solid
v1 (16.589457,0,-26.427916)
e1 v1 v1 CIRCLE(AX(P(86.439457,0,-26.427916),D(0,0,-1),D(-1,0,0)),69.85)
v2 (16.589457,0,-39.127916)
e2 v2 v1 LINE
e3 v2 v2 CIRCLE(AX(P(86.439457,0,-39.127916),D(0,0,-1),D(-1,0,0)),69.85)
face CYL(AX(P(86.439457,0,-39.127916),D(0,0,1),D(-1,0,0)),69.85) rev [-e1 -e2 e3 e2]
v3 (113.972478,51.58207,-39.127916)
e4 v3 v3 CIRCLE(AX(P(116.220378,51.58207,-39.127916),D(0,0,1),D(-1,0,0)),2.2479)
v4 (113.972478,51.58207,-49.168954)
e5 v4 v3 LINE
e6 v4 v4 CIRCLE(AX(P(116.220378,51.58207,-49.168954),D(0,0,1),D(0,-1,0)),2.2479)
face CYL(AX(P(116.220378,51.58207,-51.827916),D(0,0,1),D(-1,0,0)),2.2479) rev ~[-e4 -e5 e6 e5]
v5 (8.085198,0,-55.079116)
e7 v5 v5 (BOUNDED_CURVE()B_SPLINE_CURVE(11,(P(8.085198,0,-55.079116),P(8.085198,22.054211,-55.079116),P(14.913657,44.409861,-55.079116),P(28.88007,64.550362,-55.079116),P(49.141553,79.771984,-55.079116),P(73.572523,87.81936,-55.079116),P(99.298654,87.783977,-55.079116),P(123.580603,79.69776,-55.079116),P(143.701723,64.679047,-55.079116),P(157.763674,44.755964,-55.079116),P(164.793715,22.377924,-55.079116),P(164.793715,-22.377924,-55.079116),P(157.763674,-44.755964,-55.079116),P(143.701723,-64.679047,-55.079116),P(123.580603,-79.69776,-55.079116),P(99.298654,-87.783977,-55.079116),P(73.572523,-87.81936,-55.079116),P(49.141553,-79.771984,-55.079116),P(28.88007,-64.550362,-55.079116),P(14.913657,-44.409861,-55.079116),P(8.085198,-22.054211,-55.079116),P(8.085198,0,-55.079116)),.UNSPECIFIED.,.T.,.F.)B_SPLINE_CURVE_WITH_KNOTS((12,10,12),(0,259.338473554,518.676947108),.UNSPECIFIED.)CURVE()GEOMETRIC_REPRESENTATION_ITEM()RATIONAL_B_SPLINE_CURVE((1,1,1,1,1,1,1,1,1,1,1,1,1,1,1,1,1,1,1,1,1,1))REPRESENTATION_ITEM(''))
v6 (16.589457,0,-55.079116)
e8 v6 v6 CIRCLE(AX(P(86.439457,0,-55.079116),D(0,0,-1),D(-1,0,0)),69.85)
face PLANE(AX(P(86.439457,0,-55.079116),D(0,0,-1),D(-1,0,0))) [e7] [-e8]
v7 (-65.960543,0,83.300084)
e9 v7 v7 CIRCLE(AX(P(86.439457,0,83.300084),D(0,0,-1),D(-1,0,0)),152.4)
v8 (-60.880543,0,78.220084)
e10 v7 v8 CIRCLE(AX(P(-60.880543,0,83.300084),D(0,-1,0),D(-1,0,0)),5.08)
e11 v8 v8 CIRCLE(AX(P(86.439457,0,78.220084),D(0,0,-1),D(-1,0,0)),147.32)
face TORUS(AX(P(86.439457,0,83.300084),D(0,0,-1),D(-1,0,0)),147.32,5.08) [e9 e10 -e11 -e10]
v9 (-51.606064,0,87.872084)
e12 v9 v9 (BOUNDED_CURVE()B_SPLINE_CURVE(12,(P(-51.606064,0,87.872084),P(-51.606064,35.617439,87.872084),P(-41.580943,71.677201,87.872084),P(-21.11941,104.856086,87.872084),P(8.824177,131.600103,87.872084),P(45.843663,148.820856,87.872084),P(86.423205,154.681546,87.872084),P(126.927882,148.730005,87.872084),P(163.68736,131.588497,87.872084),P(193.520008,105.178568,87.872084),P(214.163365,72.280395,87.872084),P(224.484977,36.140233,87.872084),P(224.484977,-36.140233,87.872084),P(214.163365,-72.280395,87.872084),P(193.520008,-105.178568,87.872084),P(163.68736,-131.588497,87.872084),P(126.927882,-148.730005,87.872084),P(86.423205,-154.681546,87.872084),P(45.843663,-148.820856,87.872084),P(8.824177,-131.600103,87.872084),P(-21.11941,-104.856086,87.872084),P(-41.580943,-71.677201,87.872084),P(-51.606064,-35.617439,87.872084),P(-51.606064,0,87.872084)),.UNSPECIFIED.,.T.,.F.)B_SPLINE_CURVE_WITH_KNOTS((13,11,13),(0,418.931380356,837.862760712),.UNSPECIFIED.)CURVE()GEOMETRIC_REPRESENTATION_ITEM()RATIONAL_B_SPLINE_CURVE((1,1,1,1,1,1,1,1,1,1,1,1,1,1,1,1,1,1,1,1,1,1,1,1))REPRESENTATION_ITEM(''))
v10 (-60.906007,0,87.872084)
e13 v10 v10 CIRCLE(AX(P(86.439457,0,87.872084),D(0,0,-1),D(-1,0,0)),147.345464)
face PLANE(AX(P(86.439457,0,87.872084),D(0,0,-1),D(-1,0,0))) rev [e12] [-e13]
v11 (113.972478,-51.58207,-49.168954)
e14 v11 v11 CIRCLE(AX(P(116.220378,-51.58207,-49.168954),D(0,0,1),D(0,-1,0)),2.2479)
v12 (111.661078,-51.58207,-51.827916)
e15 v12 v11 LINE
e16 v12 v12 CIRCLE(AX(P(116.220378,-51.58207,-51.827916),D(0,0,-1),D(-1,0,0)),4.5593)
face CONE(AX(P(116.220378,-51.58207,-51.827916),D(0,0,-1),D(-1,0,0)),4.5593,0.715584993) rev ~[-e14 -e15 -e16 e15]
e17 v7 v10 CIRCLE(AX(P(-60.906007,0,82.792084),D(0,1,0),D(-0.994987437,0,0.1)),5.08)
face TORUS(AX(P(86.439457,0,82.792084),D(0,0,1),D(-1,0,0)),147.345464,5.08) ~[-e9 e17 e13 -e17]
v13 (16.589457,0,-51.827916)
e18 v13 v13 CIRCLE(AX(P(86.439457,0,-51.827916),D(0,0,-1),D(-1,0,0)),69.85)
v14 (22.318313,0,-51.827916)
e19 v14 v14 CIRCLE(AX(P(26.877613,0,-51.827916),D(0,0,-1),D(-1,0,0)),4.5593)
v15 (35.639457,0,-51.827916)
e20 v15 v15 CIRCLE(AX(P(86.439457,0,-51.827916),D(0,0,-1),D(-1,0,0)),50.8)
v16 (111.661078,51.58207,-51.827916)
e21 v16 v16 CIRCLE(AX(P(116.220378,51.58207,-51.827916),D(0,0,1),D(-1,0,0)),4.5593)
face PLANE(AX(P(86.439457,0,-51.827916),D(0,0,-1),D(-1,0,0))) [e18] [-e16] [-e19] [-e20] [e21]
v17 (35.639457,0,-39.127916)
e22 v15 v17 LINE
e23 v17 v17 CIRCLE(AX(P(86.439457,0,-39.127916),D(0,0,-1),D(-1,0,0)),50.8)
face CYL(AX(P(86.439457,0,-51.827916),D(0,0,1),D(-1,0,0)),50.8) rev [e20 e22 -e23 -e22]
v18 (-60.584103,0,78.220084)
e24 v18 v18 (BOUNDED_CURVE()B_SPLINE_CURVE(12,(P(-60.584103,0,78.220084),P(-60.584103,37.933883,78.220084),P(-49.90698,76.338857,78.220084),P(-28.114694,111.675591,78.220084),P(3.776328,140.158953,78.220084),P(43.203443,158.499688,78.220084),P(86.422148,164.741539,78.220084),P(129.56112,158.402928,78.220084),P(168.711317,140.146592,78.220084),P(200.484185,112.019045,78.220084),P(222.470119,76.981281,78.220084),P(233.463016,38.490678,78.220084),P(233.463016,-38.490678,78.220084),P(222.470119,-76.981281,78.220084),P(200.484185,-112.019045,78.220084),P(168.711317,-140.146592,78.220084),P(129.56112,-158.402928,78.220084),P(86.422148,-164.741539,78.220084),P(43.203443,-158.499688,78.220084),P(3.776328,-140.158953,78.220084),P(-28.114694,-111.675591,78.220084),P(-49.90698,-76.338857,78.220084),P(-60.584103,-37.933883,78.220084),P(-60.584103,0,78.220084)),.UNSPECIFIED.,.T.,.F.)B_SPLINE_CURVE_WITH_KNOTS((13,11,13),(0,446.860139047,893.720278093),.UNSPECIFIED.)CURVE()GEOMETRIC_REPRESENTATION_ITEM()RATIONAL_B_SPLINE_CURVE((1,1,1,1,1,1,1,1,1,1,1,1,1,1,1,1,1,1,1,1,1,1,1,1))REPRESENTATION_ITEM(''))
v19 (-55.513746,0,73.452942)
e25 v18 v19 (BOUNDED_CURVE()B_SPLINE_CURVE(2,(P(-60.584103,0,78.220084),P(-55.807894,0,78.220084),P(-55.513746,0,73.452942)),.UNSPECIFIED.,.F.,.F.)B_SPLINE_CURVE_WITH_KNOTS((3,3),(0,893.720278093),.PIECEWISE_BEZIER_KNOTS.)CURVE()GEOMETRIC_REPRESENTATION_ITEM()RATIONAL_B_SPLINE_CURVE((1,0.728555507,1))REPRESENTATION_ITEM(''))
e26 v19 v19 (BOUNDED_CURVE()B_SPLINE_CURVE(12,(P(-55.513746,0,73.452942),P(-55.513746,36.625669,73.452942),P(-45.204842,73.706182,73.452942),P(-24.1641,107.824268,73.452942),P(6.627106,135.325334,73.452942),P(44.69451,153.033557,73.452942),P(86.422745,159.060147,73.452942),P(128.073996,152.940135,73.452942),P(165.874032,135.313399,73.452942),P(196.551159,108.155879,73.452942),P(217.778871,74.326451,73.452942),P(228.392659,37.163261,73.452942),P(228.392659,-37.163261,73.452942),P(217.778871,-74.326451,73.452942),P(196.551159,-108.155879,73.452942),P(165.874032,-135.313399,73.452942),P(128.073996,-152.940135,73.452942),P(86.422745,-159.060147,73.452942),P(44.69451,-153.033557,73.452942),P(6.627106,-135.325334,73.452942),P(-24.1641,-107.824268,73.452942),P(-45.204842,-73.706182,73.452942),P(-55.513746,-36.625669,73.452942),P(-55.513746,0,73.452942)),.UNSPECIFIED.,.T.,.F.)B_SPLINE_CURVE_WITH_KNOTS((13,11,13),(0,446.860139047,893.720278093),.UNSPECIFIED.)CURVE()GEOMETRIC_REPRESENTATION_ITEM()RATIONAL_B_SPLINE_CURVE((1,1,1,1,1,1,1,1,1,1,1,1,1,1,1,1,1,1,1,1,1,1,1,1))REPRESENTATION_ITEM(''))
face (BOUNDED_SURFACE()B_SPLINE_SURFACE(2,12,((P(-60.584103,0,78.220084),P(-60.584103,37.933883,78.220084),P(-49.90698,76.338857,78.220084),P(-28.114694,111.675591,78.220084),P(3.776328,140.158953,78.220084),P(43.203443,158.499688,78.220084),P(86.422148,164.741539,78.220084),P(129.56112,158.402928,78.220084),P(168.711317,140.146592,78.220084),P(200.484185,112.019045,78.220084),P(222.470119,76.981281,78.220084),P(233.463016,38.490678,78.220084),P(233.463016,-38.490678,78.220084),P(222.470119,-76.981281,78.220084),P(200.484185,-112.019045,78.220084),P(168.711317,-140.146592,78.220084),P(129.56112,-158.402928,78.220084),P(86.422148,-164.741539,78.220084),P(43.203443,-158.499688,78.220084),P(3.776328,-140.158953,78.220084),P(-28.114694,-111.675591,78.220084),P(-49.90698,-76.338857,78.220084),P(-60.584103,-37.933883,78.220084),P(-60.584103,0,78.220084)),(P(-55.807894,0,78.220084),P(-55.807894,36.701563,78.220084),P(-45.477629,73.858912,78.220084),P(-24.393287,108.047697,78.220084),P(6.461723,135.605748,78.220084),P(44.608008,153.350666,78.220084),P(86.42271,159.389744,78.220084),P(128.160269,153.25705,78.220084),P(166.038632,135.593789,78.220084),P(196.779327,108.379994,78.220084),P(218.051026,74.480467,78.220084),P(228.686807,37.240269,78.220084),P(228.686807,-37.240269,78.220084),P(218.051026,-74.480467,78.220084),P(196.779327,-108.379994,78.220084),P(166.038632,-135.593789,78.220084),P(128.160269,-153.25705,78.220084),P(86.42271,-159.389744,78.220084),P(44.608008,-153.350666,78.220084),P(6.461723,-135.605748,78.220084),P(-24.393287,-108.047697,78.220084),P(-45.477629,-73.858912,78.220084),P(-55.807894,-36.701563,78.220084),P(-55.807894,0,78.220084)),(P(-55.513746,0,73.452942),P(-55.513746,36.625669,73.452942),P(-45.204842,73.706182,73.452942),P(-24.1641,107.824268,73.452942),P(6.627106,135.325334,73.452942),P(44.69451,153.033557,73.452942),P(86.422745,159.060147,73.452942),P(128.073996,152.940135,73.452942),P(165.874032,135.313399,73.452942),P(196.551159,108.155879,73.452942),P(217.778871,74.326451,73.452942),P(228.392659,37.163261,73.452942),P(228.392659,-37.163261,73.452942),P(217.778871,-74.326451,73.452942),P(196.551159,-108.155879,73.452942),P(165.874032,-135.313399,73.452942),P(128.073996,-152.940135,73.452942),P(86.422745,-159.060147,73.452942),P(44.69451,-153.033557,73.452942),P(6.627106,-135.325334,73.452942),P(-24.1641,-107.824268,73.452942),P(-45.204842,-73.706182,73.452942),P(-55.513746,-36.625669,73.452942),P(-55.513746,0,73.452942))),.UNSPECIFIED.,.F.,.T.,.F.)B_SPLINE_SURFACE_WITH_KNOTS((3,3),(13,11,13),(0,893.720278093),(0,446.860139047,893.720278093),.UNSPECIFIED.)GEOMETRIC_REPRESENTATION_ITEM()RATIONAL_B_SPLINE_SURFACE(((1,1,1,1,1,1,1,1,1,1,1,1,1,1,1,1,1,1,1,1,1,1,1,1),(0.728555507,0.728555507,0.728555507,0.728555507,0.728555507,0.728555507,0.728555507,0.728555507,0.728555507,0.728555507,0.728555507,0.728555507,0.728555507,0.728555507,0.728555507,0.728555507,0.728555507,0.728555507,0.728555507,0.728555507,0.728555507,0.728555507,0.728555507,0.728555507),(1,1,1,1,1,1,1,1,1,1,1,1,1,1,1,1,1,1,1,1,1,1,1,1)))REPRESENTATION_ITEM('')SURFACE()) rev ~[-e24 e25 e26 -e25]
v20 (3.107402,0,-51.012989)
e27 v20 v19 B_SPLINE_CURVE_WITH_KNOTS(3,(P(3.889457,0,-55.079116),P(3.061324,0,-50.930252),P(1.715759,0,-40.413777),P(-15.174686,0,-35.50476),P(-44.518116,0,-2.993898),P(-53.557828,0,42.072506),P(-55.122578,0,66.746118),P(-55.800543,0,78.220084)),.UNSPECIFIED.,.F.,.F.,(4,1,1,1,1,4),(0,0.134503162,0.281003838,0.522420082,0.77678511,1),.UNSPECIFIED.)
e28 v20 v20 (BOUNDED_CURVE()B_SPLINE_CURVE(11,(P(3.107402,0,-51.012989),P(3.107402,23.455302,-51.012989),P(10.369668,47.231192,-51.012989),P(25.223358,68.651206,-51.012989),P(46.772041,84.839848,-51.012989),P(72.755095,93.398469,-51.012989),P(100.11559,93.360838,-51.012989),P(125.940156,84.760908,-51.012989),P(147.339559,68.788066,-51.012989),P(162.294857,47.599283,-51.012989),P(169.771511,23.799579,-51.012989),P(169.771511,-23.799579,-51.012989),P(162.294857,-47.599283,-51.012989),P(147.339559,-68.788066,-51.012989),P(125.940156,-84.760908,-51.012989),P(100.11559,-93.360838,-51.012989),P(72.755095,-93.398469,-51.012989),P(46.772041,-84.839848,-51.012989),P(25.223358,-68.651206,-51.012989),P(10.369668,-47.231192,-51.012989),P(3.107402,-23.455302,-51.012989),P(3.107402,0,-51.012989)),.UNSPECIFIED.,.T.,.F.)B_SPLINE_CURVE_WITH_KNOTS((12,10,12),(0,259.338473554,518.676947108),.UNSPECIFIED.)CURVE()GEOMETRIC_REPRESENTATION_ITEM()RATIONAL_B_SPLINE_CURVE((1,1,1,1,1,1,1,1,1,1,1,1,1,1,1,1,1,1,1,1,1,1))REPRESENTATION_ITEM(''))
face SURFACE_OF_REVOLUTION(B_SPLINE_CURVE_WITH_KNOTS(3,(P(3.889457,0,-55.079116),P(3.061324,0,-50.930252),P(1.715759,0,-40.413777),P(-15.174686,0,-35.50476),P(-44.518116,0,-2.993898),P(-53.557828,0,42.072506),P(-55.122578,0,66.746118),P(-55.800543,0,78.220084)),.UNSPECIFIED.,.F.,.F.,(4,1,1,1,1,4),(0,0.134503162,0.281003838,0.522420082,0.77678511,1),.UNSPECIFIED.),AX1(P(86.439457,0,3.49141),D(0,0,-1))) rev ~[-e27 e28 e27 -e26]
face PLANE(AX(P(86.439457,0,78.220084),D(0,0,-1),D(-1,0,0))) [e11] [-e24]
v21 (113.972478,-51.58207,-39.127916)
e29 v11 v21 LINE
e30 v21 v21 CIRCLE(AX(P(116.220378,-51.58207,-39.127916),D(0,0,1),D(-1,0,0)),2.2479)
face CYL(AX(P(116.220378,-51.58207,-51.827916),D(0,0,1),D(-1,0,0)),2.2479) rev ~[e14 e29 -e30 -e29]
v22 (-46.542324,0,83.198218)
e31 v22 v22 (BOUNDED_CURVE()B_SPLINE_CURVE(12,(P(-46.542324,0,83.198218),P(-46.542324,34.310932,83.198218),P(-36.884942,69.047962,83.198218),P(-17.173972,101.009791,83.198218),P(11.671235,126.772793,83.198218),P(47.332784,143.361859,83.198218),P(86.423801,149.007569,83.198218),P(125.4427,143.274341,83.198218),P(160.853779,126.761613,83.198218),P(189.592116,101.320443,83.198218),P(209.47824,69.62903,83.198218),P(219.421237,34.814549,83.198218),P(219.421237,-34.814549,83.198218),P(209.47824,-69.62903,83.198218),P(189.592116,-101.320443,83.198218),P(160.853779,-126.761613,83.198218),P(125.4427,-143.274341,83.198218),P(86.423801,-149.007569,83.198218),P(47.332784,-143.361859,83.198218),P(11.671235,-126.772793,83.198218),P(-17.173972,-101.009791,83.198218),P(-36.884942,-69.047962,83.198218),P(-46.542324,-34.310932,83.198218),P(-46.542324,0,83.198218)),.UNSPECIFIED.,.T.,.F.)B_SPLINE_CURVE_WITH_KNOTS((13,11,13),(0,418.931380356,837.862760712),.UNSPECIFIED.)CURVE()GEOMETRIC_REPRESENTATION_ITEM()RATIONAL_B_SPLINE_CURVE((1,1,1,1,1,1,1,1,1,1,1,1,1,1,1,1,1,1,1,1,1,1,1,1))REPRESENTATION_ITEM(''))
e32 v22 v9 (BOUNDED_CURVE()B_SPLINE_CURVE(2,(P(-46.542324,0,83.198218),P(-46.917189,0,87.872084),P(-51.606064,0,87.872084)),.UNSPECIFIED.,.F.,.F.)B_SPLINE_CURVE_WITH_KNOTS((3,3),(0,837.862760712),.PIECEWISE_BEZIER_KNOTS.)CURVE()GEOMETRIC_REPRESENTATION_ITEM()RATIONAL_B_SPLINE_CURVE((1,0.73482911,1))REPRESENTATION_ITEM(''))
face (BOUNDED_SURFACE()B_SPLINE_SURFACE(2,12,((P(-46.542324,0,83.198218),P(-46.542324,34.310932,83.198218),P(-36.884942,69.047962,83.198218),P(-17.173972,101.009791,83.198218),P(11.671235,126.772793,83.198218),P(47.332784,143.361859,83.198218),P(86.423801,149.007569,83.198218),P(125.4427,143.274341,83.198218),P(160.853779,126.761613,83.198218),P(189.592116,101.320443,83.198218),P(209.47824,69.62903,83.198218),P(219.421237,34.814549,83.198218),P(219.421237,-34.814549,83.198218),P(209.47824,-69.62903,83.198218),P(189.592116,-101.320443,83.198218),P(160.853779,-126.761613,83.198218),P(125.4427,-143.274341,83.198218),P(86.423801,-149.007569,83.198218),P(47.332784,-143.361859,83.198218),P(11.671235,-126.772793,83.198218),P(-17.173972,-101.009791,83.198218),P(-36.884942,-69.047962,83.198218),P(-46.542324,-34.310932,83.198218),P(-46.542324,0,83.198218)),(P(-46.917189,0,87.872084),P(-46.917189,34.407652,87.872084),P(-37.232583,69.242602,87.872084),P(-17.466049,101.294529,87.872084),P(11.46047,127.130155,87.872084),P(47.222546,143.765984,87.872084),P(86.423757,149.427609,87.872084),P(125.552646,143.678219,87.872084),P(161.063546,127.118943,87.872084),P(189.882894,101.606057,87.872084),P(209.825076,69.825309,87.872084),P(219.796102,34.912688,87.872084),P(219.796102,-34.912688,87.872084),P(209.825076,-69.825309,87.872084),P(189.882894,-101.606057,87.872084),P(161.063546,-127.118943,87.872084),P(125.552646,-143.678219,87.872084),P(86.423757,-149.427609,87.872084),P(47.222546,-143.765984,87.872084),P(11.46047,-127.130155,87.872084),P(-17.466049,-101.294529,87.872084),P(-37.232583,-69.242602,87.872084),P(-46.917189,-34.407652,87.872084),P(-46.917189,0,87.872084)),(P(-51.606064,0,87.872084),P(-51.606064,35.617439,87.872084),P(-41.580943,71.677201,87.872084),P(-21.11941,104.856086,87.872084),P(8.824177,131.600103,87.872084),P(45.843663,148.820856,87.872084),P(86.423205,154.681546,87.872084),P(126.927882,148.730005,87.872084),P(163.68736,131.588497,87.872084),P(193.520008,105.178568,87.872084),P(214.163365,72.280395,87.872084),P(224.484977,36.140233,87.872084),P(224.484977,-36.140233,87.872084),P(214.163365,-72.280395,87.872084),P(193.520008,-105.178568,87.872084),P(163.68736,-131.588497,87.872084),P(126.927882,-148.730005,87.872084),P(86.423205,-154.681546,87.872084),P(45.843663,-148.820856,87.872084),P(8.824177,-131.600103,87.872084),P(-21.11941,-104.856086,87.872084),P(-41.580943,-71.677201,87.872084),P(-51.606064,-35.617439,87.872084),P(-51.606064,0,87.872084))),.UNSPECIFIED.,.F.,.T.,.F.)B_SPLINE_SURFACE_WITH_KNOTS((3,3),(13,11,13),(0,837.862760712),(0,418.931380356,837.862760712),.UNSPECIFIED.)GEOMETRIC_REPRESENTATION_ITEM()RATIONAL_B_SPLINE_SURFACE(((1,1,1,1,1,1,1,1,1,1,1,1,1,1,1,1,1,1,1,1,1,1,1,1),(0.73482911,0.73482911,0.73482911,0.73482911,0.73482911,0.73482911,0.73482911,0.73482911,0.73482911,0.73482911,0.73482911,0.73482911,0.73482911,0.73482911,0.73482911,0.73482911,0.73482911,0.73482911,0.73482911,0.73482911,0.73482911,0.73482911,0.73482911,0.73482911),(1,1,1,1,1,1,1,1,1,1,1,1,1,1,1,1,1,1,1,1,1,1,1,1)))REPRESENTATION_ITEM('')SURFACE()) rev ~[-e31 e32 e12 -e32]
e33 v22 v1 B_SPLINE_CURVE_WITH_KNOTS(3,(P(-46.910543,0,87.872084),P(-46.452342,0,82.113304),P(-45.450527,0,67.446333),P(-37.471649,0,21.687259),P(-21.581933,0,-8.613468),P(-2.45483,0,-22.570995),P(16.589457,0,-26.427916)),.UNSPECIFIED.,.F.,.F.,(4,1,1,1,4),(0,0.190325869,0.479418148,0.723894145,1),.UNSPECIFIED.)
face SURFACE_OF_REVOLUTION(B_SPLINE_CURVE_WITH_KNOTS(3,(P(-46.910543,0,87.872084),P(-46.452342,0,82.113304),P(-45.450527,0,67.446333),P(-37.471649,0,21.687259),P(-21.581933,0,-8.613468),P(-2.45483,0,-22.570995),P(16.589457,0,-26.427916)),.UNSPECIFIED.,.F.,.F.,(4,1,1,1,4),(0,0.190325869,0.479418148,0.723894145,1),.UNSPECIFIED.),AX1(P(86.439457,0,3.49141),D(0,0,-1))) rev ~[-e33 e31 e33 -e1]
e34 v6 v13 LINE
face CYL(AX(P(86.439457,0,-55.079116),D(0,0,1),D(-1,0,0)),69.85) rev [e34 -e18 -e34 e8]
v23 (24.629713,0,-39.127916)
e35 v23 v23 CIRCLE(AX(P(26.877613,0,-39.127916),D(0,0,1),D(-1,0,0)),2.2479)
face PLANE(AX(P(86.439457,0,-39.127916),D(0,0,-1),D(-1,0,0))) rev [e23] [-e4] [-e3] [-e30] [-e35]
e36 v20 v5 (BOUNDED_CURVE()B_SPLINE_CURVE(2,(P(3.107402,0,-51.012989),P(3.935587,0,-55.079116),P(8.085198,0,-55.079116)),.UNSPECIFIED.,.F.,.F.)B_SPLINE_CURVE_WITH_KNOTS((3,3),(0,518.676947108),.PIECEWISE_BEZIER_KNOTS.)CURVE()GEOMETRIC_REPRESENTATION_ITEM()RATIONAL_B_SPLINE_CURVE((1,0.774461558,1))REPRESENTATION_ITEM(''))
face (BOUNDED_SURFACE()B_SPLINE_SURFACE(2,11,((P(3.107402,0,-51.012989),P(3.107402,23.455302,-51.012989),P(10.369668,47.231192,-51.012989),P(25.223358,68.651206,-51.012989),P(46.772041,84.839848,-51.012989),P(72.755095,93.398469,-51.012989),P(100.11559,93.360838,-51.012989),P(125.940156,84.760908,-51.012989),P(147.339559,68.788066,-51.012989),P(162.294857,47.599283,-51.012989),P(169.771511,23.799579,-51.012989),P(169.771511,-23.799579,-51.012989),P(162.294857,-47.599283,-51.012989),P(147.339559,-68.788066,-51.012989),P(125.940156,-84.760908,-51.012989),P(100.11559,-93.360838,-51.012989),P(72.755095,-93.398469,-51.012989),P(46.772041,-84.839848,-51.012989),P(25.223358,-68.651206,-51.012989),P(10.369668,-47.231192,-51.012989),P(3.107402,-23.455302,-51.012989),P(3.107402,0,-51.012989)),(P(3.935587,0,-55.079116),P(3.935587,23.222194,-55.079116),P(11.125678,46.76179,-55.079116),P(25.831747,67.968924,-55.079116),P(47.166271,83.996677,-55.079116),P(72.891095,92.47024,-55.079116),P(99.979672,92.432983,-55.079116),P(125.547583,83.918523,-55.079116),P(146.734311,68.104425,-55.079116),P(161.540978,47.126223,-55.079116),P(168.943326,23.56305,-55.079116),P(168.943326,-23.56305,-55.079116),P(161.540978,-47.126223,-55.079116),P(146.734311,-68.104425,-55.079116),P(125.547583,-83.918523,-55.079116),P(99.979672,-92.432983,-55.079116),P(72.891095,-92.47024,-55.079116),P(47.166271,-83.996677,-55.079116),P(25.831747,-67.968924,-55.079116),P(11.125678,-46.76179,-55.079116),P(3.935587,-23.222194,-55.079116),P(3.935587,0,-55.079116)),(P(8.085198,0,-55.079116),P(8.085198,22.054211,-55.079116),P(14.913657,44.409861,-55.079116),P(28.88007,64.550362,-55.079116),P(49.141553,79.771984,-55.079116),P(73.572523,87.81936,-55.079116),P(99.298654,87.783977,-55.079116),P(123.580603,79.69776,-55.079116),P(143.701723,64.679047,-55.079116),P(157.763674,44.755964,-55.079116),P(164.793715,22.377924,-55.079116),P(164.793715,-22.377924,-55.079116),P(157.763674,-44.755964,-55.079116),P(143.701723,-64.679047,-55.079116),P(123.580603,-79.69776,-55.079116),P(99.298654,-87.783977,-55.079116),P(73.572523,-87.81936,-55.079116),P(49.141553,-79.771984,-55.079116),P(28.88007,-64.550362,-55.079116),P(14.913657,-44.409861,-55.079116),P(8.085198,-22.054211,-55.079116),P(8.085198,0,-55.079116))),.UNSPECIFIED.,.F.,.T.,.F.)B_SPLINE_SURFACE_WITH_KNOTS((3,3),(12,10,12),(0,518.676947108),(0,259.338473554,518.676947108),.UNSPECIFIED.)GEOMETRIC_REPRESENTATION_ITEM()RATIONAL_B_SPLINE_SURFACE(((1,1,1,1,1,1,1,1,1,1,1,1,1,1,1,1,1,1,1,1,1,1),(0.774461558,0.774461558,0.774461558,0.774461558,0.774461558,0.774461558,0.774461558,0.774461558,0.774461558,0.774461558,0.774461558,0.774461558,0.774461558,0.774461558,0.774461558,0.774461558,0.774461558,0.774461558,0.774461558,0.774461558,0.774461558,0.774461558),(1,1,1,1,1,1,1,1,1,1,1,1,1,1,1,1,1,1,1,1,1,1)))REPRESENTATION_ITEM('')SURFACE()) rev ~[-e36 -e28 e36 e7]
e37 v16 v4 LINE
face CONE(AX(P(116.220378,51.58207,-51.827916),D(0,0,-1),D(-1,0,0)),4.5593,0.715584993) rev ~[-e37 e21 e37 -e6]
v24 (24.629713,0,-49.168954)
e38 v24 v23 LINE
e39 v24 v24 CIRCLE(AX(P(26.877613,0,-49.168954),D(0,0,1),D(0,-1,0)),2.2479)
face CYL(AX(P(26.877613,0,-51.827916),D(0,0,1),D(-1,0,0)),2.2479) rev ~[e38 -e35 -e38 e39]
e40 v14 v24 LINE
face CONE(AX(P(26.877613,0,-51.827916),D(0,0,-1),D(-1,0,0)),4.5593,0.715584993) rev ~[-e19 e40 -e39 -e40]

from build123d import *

# Parameters (mm, degrees)
F2_R           = 5.08
F5_D           = 4.4958
F5_CSINK_D     = 9.1186
F5_CSINK_ANGLE = 82


# Not quite as in the source:
# - a fillet or chamfer that OpenCascade refuses, or shapes differently, is made with other operations: its cross-section is extruded or revolved along the edge and cut away or added


with BuildPart() as f1:
    # F0 (on Front) → F1 (revolve)
    with BuildSketch(Plane.XZ):
        with BuildLine():
            Line((35.6394565043, -51.8279158927), (35.6394565043, -39.1279158927))
            Line((35.6394565043, -39.1279158927), (16.5894565043, -39.1279158927))
            Line((16.5894565043, -39.1279158927), (16.5894565043, -26.4279158927))
            add(Edge.make_bspline(
                [(-46.9105434957, 87.8720841073), (-46.4523417325, 82.1133038662), (-45.4505271847, 67.4463326401), (-37.4716489611, 21.6872589154), (-21.5819325296, -8.6134677414), (-2.4548303935, -22.5709949341), (16.5894565043, -26.4279158927)],
                knots=[0, 0, 0, 0, 0.1903258692, 0.4794181484, 0.723894145, 1, 1, 1, 1], degree=3))
            Line((-46.9105434957, 87.8720841073), (-65.9605434957, 87.8720841073))
            Line((-65.9605434957, 87.8720841073), (-65.9605434957, 78.2200841073))
            Line((-65.9605434957, 78.2200841073), (-55.8005434957, 78.2200841073))
            add(Edge.make_bspline(
                [(3.8894565043, -55.0791158927), (3.0613241863, -50.9302523012), (1.7157592211, -40.4137768343), (-15.1746857428, -35.5047598054), (-44.5181155794, -2.9938984023), (-53.5578284027, 42.0725062006), (-55.1225781399, 66.7461177922), (-55.8005434957, 78.2200841073)],
                knots=[0, 0, 0, 0, 0.1345031618, 0.2810038383, 0.5224200823, 0.7767851103, 1, 1, 1, 1], degree=3))
            Line((3.8894565043, -55.0791158927), (16.5894565043, -55.0791158927))
            Line((16.5894565043, -55.0791158927), (16.5894565043, -51.8279158927))
            Line((16.5894565043, -51.8279158927), (35.6394565043, -51.8279158927))
        make_face()
    revolve(axis=Axis((86.4394565043, 0, 3.4914096229), (0, 0, -1)))

    # F2
    f2_edges = [f1.edges().sort_by_distance(p)[0] for p in [
        (228.679457, 0, 78.220084),
        (168.989457, 0, -55.079116),
        (-42.567778, 0, 3.022968),
        (238.839457, 0, 78.220084),
        (219.789457, 0, 87.872084),
    ]]
    fillet(f2_edges, radius=F2_R)

    # F3: fillet of radius 5.08 on 1 edges, made by hand

    # F3_s1 → F3_t2 (revolve, cut)
    with BuildSketch(Plane.XZ):
        with BuildLine():
            ThreePointArc((-65.9605434957, 83.3000841073), (-64.3137749129, 86.5595129387), (-60.9060073152, 87.8720841073))
            Line((-60.9060073152, 87.8720841073), (-65.9605434957, 87.8720841073))
            Line((-65.9605434957, 87.8720841073), (-65.9605434957, 83.3000841073))
        make_face()
    revolve(axis=Axis((86.4394565043, 0, 87.8720841073), (0, 0, -1)), mode=Mode.SUBTRACT)

    # F5 (through all)
    with Locations(Plane(origin=(0, 0, -51.8279158927), x_dir=(1, 0, 0), z_dir=(0, 0, -1))):
        with Locations((116.2203782425, 51.5820695467), (116.2203782425, -51.5820695467), (26.877613028, 0)):
            CounterSinkHole(F5_D / 2, F5_CSINK_D / 2, counter_sink_angle=F5_CSINK_ANGLE)


solid = f1.part
